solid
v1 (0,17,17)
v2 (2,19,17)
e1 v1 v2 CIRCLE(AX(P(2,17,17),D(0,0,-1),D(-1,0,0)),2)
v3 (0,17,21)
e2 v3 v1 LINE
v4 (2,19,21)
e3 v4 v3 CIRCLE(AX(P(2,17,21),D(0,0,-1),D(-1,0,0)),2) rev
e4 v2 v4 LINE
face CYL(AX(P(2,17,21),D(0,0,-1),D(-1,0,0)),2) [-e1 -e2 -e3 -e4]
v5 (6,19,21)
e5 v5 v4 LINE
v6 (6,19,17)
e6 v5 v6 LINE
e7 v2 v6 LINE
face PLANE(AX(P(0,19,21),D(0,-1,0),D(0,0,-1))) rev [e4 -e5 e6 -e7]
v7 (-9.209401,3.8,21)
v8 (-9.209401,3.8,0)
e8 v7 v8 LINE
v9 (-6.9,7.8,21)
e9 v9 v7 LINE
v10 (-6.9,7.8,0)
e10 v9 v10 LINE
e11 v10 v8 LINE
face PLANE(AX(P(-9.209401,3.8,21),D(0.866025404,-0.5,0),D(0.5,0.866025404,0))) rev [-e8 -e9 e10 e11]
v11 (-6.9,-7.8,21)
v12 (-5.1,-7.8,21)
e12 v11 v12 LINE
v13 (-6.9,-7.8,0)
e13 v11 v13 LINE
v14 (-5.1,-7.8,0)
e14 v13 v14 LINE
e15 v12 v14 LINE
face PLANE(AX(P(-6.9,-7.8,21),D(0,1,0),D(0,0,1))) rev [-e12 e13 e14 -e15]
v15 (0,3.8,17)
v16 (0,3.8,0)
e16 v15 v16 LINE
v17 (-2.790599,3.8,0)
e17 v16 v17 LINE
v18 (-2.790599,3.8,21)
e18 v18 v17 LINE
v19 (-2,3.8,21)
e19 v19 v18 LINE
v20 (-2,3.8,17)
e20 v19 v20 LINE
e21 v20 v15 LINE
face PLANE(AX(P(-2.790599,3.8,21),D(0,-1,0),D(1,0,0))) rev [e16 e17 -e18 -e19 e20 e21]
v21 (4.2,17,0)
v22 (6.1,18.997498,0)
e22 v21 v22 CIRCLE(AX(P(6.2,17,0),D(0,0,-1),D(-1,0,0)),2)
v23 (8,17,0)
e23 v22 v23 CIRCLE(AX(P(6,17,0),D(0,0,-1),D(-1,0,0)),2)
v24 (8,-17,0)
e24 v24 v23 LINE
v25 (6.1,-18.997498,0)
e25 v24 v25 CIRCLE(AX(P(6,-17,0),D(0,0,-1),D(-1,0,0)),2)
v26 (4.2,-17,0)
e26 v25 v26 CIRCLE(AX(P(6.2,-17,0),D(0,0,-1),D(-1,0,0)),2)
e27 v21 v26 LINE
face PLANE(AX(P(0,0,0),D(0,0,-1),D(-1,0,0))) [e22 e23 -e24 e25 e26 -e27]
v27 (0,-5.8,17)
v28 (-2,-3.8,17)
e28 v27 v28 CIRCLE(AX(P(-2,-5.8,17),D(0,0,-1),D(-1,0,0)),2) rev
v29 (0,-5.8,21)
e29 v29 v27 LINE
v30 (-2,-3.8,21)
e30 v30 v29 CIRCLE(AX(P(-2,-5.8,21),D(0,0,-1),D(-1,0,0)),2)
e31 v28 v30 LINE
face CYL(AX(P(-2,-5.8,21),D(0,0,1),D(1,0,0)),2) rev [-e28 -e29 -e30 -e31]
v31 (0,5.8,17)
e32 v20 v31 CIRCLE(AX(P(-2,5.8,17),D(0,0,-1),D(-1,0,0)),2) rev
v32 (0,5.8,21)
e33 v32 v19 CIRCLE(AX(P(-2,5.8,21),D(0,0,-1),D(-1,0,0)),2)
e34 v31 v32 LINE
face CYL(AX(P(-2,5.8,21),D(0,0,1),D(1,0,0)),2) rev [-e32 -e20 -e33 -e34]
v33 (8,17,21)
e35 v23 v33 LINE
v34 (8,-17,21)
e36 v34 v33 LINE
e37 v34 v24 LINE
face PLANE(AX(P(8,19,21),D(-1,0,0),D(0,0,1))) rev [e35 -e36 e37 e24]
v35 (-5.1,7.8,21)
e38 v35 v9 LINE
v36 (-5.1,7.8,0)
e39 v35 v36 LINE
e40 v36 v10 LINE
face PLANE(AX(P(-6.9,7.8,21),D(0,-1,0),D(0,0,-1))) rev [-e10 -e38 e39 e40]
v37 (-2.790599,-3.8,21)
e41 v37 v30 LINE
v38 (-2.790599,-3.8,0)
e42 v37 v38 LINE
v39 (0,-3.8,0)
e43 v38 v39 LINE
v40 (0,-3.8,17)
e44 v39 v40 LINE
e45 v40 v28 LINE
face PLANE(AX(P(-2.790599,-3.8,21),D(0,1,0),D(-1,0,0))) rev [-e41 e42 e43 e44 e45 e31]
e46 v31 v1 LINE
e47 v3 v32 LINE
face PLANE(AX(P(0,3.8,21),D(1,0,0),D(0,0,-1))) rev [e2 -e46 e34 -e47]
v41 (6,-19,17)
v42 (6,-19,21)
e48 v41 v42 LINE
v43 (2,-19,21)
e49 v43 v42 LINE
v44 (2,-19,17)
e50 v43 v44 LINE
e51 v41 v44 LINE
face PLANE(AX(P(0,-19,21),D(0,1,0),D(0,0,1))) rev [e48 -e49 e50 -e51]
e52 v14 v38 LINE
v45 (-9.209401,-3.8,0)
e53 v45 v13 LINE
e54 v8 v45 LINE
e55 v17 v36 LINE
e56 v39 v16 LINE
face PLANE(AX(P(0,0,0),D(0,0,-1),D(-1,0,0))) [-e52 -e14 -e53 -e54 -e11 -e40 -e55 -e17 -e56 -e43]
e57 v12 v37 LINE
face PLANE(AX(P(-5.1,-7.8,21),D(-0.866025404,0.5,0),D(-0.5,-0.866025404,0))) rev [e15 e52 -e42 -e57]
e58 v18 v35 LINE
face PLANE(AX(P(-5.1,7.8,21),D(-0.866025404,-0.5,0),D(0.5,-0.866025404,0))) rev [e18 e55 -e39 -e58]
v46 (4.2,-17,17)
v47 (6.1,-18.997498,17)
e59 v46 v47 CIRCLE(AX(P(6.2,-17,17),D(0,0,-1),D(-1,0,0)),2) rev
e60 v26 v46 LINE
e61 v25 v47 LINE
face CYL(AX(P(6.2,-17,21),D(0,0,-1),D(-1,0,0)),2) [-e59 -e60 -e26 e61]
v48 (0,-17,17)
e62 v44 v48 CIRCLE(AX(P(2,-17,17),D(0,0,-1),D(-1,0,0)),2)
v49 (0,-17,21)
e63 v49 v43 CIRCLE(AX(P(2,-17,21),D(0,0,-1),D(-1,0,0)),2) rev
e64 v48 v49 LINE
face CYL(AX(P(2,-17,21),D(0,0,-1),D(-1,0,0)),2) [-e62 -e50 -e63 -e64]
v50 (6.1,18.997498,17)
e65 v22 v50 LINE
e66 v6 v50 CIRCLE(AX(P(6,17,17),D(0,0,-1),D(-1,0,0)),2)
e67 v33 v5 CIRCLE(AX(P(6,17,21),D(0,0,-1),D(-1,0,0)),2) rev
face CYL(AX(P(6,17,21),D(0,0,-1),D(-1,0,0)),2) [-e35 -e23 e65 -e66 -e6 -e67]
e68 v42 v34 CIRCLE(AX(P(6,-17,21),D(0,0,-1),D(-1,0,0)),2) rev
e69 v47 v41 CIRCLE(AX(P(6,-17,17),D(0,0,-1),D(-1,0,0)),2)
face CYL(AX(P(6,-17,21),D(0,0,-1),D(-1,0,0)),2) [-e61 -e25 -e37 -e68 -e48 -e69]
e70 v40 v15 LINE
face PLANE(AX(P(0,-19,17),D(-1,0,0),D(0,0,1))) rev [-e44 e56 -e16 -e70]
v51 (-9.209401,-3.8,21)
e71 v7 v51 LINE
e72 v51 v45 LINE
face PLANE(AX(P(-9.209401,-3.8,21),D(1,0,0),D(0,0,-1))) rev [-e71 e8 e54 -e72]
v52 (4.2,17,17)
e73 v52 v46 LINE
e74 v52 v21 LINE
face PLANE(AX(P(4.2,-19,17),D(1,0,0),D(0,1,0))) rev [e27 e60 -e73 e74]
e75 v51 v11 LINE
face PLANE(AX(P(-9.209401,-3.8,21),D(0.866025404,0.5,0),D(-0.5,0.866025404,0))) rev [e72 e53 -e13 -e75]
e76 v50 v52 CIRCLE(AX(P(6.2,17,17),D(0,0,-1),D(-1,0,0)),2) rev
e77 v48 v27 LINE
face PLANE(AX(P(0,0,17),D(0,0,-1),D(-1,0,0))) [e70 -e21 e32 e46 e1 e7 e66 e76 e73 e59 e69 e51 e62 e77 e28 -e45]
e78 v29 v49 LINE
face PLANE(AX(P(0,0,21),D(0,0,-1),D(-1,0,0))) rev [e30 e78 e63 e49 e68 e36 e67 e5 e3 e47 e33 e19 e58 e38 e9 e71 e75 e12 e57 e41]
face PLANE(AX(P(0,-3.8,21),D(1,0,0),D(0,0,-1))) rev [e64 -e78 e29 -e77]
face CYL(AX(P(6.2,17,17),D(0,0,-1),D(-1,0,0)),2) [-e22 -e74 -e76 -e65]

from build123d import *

# Parameters (mm, degrees)
SALIENTE_EXTRUIR1_DEPTH = 21
CROQUIS3_W              = 4.2
CROQUIS3_H              = 38
CORTAR_EXTRUIR1_DEPTH   = 17
REDONDEO1_R             = 2


with BuildPart() as part:
    # Croquis1 → Saliente-Extruir1 (new body)
    with BuildSketch(Plane(origin=(0, 0, 0), x_dir=(0, 1, 0), z_dir=(0, 0, 1))):
        Polygon((-3.8, 9.209401077), (3.8, 9.209401077), (7.8, 6.9), (7.8, 5.1), (3.8, 2.790598923), (3.8, 0), (19, 0), (19, -8), (-19, -8), (-19, 0), (-3.8, 0), (-3.8, 2.790598923), (-7.8, 5.1), (-7.8, 6.9), align=None)
    extrude(amount=SALIENTE_EXTRUIR1_DEPTH)

    # Croquis3 → Cortar-Extruir1 (cut)
    with BuildSketch(Plane(origin=(0, 0, 0), x_dir=(1, 0, 0), z_dir=(0, 0, -1))):
        with Locations((2.1, 0)):
            Rectangle(CROQUIS3_W, CROQUIS3_H)
    extrude(amount=-CORTAR_EXTRUIR1_DEPTH, mode=Mode.SUBTRACT)

    # Redondeo1
    # the kernel refuses this fillet: 2 mm, written as the material it adds along each edge
    with BuildSketch(Plane(origin=(0, -3.8, 17), x_dir=(-1, 0, 0), z_dir=(0, 0, 1))) as redondeo1_piece_1:
        with BuildLine():
            CenterArc((REDONDEO1_R, REDONDEO1_R), REDONDEO1_R, 180, 90)
            Line((0, REDONDEO1_R), (0, 0))
            Line((0, 0), (REDONDEO1_R, 0))
        make_face()
    extrude(amount=4)
    with BuildSketch(Plane(origin=(0, 3.8, 17), x_dir=(-1, 0, 0), z_dir=(0, 0, 1))) as redondeo1_piece_2:
        with BuildLine():
            CenterArc((REDONDEO1_R, -REDONDEO1_R), REDONDEO1_R, 90, 90)
            Line((0, -REDONDEO1_R), (0, 0))
            Line((0, 0), (REDONDEO1_R, 0))
        make_face()
    extrude(amount=4)
    # the kernel refuses this fillet: 2 mm, written as the material it takes off along each edge
    with BuildSketch(Plane(origin=(8, 19, -5), x_dir=(-1, 0, 0), z_dir=(0, 0, 1)), Plane(origin=(8, -19, -5), x_dir=(0, 1, 0), z_dir=(0, 0, 1))) as redondeo1_2_piece_1:
        with BuildLine():
            CenterArc((REDONDEO1_R, REDONDEO1_R), REDONDEO1_R, 180, 90)
            Line((0, REDONDEO1_R), (0, 0))
            Line((0, 0), (REDONDEO1_R, 0))
        make_face()
    extrude(amount=31, mode=Mode.SUBTRACT)
    with BuildSketch(Plane(origin=(4.2, -19, -5), x_dir=(1, 0, 0), z_dir=(0, 0, 1))) as redondeo1_2_piece_2:
        with BuildLine():
            CenterArc((REDONDEO1_R, REDONDEO1_R), REDONDEO1_R, 180, 90)
            Line((0, REDONDEO1_R), (0, 0))
            Line((0, 0), (REDONDEO1_R, 0))
        make_face()
    extrude(amount=22, mode=Mode.SUBTRACT)
    with BuildSketch(Plane(origin=(0, -19, 12), x_dir=(1, 0, 0), z_dir=(0, 0, 1)), Plane(origin=(0, 19, 12), x_dir=(0, -1, 0), z_dir=(0, 0, 1))) as redondeo1_2_piece_3:
        with BuildLine():
            CenterArc((REDONDEO1_R, REDONDEO1_R), REDONDEO1_R, 180, 90)
            Line((0, REDONDEO1_R), (0, 0))
            Line((0, 0), (REDONDEO1_R, 0))
        make_face()
    extrude(amount=14, mode=Mode.SUBTRACT)
    with BuildSketch(Plane(origin=(4.2, 19, -5), x_dir=(1, 0, 0), z_dir=(0, 0, 1))) as redondeo1_2_piece_4:
        with BuildLine():
            CenterArc((REDONDEO1_R, -REDONDEO1_R), REDONDEO1_R, 90, 90)
            Line((0, -REDONDEO1_R), (0, 0))
            Line((0, 0), (REDONDEO1_R, 0))
        make_face()
    extrude(amount=22, mode=Mode.SUBTRACT)


solid = part.part
